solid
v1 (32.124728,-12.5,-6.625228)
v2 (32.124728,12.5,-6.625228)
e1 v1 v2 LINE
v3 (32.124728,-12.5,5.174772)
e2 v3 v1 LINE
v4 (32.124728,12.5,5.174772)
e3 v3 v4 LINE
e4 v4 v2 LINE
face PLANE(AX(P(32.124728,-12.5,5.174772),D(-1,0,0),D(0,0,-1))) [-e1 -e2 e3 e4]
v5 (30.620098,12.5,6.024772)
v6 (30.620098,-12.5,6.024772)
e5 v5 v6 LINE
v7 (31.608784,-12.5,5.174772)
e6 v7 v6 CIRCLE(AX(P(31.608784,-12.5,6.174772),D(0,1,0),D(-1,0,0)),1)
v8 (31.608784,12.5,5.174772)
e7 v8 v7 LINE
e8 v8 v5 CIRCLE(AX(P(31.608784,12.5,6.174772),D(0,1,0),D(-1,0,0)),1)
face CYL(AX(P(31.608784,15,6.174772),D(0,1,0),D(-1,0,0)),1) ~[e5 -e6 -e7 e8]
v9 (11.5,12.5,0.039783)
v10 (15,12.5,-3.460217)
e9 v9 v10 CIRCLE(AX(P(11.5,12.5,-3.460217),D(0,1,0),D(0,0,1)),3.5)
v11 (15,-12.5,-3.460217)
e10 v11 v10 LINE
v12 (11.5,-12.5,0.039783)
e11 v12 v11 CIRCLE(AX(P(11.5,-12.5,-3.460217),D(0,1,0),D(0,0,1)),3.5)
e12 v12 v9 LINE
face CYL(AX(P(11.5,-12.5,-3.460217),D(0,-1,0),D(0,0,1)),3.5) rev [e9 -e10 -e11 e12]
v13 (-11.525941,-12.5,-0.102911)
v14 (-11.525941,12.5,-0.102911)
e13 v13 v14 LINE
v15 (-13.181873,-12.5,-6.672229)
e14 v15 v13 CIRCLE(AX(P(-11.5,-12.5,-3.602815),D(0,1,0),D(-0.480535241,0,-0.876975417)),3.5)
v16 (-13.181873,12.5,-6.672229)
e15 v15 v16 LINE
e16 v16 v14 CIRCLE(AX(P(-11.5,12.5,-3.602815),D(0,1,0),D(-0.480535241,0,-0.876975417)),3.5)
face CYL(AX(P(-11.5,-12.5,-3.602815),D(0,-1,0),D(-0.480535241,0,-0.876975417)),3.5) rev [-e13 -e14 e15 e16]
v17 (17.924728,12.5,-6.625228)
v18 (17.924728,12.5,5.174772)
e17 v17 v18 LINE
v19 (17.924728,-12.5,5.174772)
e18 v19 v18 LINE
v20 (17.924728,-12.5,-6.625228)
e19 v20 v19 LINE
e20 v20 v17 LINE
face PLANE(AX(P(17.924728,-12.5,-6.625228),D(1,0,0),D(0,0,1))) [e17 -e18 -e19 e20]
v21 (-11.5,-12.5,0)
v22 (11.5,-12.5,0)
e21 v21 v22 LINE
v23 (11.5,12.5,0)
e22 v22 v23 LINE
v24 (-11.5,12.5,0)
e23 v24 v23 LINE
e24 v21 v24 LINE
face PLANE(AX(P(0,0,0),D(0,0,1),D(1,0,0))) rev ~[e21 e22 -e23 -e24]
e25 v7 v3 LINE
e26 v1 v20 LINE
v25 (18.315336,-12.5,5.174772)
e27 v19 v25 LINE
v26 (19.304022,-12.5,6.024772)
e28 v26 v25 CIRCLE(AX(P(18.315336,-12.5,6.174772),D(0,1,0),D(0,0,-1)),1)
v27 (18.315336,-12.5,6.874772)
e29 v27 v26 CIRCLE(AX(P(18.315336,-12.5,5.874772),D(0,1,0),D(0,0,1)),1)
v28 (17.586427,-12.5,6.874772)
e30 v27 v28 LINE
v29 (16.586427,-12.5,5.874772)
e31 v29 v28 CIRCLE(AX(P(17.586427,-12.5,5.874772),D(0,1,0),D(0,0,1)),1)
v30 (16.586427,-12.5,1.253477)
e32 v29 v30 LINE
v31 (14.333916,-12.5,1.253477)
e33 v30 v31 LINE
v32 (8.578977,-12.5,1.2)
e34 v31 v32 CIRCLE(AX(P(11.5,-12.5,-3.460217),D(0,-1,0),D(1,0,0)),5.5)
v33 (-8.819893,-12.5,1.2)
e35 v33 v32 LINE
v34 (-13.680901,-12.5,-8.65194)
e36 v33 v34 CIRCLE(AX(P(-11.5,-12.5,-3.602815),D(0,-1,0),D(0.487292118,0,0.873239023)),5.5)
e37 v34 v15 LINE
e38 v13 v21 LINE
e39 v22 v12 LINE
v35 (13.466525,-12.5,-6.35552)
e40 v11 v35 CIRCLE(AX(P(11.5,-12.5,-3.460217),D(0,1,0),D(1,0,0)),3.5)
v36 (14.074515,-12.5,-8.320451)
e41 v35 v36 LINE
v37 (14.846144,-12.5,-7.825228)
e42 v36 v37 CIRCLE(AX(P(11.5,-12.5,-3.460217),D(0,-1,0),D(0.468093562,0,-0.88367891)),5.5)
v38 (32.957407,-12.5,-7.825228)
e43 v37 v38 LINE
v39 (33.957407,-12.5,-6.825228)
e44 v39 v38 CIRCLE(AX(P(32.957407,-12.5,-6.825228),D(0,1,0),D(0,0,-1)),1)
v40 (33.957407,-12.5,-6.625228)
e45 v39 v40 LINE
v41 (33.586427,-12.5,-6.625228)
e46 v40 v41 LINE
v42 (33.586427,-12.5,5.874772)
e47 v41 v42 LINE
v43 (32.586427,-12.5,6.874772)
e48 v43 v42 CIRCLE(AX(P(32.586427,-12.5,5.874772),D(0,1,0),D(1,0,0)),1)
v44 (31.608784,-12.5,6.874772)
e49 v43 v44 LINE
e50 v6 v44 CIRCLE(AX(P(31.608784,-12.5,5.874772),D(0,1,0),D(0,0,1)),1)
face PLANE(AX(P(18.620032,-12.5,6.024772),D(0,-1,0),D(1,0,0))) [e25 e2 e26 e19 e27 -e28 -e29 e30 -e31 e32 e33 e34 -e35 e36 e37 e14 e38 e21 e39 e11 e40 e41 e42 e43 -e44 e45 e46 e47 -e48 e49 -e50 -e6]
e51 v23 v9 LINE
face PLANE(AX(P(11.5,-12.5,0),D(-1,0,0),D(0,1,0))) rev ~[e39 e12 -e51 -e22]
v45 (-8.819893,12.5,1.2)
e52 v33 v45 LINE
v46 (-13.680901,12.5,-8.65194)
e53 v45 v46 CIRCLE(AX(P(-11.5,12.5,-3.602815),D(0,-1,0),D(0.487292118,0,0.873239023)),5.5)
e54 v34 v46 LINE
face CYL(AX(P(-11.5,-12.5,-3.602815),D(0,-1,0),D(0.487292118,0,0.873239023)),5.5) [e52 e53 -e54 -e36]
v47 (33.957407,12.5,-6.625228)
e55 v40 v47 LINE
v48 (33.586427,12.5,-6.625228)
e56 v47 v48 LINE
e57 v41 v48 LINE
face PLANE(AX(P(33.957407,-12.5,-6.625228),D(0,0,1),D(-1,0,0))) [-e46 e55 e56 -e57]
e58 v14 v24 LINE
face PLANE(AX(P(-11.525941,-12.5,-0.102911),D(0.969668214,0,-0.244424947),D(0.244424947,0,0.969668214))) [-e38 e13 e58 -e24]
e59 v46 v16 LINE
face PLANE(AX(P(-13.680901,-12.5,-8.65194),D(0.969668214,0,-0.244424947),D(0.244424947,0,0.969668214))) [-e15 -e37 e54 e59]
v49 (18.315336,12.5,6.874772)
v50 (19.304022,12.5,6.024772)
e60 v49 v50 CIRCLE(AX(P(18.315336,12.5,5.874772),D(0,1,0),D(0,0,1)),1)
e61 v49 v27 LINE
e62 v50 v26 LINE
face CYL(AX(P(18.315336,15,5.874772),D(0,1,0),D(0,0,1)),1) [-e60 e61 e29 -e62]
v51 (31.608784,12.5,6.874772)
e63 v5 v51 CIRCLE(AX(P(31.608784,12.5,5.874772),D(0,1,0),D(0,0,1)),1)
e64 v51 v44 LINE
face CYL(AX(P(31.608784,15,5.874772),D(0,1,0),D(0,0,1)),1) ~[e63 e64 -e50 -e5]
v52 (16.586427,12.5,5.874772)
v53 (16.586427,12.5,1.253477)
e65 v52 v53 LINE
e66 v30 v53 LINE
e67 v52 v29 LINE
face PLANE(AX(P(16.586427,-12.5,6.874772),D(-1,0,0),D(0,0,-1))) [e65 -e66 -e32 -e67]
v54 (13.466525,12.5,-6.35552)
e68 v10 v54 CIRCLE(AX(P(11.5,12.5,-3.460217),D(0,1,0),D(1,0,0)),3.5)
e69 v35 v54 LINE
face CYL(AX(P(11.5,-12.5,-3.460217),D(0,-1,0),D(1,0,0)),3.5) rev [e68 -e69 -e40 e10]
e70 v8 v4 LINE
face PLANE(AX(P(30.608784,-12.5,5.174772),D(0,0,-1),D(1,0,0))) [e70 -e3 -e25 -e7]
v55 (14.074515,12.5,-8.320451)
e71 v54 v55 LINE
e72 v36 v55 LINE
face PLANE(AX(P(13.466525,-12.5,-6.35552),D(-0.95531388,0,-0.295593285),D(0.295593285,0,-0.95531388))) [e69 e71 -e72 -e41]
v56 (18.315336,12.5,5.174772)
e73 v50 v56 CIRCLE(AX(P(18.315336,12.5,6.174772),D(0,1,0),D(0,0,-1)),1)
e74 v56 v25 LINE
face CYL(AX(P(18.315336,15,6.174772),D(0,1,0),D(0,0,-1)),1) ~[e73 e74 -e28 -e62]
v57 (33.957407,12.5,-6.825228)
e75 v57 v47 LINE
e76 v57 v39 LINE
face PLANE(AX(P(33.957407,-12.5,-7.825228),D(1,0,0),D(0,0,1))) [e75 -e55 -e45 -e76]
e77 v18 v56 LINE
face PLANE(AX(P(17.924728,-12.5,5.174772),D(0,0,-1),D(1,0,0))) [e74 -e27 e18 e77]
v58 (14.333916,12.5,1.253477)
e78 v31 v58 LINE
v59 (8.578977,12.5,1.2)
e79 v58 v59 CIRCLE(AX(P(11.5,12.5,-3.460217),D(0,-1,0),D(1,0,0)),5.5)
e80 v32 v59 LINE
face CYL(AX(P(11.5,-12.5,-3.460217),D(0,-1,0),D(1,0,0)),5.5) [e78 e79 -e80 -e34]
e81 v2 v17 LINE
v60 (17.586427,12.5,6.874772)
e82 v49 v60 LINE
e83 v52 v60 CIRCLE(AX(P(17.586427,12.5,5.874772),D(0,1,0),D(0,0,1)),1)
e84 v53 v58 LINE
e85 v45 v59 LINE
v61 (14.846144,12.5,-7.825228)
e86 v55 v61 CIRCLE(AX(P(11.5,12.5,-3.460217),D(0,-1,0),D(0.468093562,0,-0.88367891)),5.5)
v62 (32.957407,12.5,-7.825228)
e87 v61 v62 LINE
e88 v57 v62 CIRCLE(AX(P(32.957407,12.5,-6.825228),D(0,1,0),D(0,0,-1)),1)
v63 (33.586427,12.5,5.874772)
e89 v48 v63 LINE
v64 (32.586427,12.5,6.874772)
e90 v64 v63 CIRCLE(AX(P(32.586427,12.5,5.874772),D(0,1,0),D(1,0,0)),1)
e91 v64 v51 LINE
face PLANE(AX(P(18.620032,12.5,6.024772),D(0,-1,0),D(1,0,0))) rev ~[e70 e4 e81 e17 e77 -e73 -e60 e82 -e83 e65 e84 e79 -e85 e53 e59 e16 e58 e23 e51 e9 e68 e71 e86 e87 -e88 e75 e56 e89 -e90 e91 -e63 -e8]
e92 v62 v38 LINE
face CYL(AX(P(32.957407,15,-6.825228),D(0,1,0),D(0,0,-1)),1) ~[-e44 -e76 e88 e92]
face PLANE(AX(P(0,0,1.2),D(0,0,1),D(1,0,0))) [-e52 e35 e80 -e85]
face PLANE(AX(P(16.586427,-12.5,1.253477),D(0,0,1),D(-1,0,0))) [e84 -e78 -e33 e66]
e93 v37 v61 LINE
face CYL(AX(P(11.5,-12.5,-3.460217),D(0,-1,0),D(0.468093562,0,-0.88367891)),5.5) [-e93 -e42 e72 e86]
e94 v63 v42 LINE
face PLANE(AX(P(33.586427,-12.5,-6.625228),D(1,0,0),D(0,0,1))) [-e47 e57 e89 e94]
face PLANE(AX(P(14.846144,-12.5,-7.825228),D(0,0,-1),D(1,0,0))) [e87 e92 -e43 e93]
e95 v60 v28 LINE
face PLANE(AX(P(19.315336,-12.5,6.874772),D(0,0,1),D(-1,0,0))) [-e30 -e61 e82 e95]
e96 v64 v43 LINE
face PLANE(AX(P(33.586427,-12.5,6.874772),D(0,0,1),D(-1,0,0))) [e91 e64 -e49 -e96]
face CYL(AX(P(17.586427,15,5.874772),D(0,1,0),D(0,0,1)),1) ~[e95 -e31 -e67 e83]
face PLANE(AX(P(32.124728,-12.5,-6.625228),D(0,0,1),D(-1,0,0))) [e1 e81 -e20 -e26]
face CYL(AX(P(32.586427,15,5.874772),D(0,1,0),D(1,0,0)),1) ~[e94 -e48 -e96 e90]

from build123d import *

# Parameters (mm, degrees)
F0_W        = 23
F0_H        = 25
F1_DEPTH    = 1.2
F3_DEPTH    = 25
F5_W        = 1.3906080276
F5_H        = 1.7
F5_W_2      = 1.5159434646
F6_DEPTH    = 25
F7_T1_DEPTH = 30


# Not quite as in the source:
# - a fillet or chamfer that OpenCascade refuses, or shapes differently, is made with other operations: its cross-section is extruded or revolved along the edge and cut away or added


with BuildPart() as f1:
    # F0 (on Top) → F1 (new body)
    with BuildSketch(Plane.XY):
        Rectangle(F0_W, F0_H)
    extrude(amount=F1_DEPTH)

    # F2 (on face) → F3 (join)
    with BuildSketch(Plane.XZ.offset(12.5)):
        with BuildLine():
            ThreePointArc((-8.8198933508, 1.2), (-16.4322899898, -1.1691927474), (-13.6809007153, -8.6519404997))
            Line((-13.6809007153, -8.6519404997), (-13.1818733439, -6.6722285874))
            ThreePointArc((-13.1818733439, -6.6722285874), (-14.8938387487, -2.747327312), (-11.5259407878, -0.1029107612))
            Line((-11.5259407878, -0.1029107612), (-11.5, 0))
            Line((-11.5, 0), (-11.5, 1.2))
            Line((-11.5, 1.2), (-8.8198933508, 1.2))
        make_face()
        with BuildLine():
            ThreePointArc((17, -3.4602172673), (14.1631160155, 1.3520392811), (8.578977059, 1.2))
            Line((8.578977059, 1.2), (11.5, 1.2))
            Line((11.5, 1.2), (11.5, 0.0397827327))
            ThreePointArc((11.5, 0.0397827327), (13.9748737342, -0.9853435331), (15, -3.4602172673))
            ThreePointArc((15, -3.4602172673), (14.5929628971, -5.0983810311), (13.4665254188, -6.3555199764))
            Line((13.4665254188, -6.3555199764), (14.0745145934, -8.3204512748))
            ThreePointArc((14.0745145934, -8.3204512748), (16.2122091562, -6.2966031487), (17, -3.4602172673))
        make_face()
    extrude(amount=-F3_DEPTH)

    # F5 (on face) → F6 (join)
    with BuildSketch(Plane.XZ.offset(12.5)):
        with Locations((18.6200318858, 6.0247716144)):
            Rectangle(F5_W, F5_H)
        with BuildLine():
            ThreePointArc((16.5864266455, -1.367787106), (17, -3.4602172673), (16.5864266455, -5.5526474285))
            Line((16.5864266455, -5.5526474285), (16.5864266455, -6.6252283856))
            Line((16.5864266455, -6.6252283856), (17.924727872, -6.6252283856))
            Line((17.924727872, -6.6252283856), (17.924727872, 5.1747716144))
            Line((17.924727872, 5.1747716144), (17.924727872, 6.8747716144))
            Line((17.924727872, 6.8747716144), (16.5864266455, 6.8747716144))
            Line((16.5864266455, 6.8747716144), (16.5864266455, 1.253477479))
            Line((16.5864266455, 1.253477479), (16.5864266455, -1.367787106))
        make_face()
        Polygon((32.124727872, -6.6252283856), (33.5864266455, -6.6252283856), (33.5864266455, 6.8747716144), (32.124727872, 6.8747716144), (32.124727872, 5.1747716144), align=None)
        with Locations((31.3667561397, 6.0247716144)):
            Rectangle(F5_W_2, F5_H)
        with BuildLine():
            Line((14.8461437412, -7.8252283856), (16.5864266455, -7.8252283856))
            Line((16.5864266455, -7.8252283856), (33.9574068785, -7.8252283856))
            Line((33.9574068785, -7.8252283856), (33.9574068785, -6.6252283856))
            Line((33.9574068785, -6.6252283856), (33.5864266455, -6.6252283856))
            Line((33.5864266455, -6.6252283856), (32.124727872, -6.6252283856))
            Line((32.124727872, -6.6252283856), (17.924727872, -6.6252283856))
            Line((17.924727872, -6.6252283856), (16.5864266455, -6.6252283856))
            Line((16.5864266455, -6.6252283856), (16.5864266455, -5.5526474285))
            ThreePointArc((16.5864266455, -5.5526474285), (15.8667169456, -6.8041345983), (14.8461437412, -7.8252283856))
        make_face()
        with BuildLine():
            ThreePointArc((14.333916343, 1.253477479), (15.6714164585, 0.1243726298), (16.5864266455, -1.367787106))
            Line((16.5864266455, -1.367787106), (16.5864266455, 1.253477479))
            Line((16.5864266455, 1.253477479), (14.333916343, 1.253477479))
        make_face()
    extrude(amount=-F6_DEPTH)

    # F7: fillet of radius 1 on 7 edges, made by hand

    # F7_s2 → F7_t1 (cut)
    with BuildSketch(Plane.XZ.offset(-15)):
        with BuildLine():
            ThreePointArc((33.5864266455, 5.8747716144), (33.2935334267, 6.5818783956), (32.5864266455, 6.8747716144))
            Line((32.5864266455, 6.8747716144), (33.5864266455, 6.8747716144))
            Line((33.5864266455, 6.8747716144), (33.5864266455, 5.8747716144))
        make_face()
        with BuildLine():
            ThreePointArc((17.5864266455, 6.8747716144), (16.8793198643, 6.5818783956), (16.5864266455, 5.8747716144))
            Line((16.5864266455, 5.8747716144), (16.5864266455, 6.8747716144))
            Line((16.5864266455, 6.8747716144), (17.5864266455, 6.8747716144))
        make_face()
        with BuildLine():
            ThreePointArc((18.3153358996, 5.1747716144), (19.0224426808, 5.4676648332), (19.3153358996, 6.1747716144))
            Line((19.3153358996, 6.1747716144), (19.3153358996, 5.1747716144))
            Line((19.3153358996, 5.1747716144), (18.3153358996, 5.1747716144))
        make_face()
        with BuildLine():
            ThreePointArc((30.6087844074, 6.1747716144), (30.9016776262, 5.4676648332), (31.6087844074, 5.1747716144))
            Line((31.6087844074, 5.1747716144), (30.6087844074, 5.1747716144))
            Line((30.6087844074, 5.1747716144), (30.6087844074, 6.1747716144))
        make_face()
        with BuildLine():
            ThreePointArc((31.6087844074, 6.8747716144), (30.9016776262, 6.5818783956), (30.6087844074, 5.8747716144))
            Line((30.6087844074, 5.8747716144), (30.6087844074, 6.8747716144))
            Line((30.6087844074, 6.8747716144), (31.6087844074, 6.8747716144))
        make_face()
        with BuildLine():
            ThreePointArc((18.3153358996, 6.8747716144), (19.0224426808, 6.5818783956), (19.3153358996, 5.8747716144))
            Line((19.3153358996, 5.8747716144), (19.3153358996, 6.8747716144))
            Line((19.3153358996, 6.8747716144), (18.3153358996, 6.8747716144))
        make_face()
        with BuildLine():
            ThreePointArc((32.9574068785, -7.8252283856), (33.6645136597, -7.5323351668), (33.9574068785, -6.8252283856))
            Line((33.9574068785, -6.8252283856), (33.9574068785, -7.8252283856))
            Line((33.9574068785, -7.8252283856), (32.9574068785, -7.8252283856))
        make_face()
    extrude(amount=F7_T1_DEPTH, mode=Mode.SUBTRACT)


solid = f1.part
